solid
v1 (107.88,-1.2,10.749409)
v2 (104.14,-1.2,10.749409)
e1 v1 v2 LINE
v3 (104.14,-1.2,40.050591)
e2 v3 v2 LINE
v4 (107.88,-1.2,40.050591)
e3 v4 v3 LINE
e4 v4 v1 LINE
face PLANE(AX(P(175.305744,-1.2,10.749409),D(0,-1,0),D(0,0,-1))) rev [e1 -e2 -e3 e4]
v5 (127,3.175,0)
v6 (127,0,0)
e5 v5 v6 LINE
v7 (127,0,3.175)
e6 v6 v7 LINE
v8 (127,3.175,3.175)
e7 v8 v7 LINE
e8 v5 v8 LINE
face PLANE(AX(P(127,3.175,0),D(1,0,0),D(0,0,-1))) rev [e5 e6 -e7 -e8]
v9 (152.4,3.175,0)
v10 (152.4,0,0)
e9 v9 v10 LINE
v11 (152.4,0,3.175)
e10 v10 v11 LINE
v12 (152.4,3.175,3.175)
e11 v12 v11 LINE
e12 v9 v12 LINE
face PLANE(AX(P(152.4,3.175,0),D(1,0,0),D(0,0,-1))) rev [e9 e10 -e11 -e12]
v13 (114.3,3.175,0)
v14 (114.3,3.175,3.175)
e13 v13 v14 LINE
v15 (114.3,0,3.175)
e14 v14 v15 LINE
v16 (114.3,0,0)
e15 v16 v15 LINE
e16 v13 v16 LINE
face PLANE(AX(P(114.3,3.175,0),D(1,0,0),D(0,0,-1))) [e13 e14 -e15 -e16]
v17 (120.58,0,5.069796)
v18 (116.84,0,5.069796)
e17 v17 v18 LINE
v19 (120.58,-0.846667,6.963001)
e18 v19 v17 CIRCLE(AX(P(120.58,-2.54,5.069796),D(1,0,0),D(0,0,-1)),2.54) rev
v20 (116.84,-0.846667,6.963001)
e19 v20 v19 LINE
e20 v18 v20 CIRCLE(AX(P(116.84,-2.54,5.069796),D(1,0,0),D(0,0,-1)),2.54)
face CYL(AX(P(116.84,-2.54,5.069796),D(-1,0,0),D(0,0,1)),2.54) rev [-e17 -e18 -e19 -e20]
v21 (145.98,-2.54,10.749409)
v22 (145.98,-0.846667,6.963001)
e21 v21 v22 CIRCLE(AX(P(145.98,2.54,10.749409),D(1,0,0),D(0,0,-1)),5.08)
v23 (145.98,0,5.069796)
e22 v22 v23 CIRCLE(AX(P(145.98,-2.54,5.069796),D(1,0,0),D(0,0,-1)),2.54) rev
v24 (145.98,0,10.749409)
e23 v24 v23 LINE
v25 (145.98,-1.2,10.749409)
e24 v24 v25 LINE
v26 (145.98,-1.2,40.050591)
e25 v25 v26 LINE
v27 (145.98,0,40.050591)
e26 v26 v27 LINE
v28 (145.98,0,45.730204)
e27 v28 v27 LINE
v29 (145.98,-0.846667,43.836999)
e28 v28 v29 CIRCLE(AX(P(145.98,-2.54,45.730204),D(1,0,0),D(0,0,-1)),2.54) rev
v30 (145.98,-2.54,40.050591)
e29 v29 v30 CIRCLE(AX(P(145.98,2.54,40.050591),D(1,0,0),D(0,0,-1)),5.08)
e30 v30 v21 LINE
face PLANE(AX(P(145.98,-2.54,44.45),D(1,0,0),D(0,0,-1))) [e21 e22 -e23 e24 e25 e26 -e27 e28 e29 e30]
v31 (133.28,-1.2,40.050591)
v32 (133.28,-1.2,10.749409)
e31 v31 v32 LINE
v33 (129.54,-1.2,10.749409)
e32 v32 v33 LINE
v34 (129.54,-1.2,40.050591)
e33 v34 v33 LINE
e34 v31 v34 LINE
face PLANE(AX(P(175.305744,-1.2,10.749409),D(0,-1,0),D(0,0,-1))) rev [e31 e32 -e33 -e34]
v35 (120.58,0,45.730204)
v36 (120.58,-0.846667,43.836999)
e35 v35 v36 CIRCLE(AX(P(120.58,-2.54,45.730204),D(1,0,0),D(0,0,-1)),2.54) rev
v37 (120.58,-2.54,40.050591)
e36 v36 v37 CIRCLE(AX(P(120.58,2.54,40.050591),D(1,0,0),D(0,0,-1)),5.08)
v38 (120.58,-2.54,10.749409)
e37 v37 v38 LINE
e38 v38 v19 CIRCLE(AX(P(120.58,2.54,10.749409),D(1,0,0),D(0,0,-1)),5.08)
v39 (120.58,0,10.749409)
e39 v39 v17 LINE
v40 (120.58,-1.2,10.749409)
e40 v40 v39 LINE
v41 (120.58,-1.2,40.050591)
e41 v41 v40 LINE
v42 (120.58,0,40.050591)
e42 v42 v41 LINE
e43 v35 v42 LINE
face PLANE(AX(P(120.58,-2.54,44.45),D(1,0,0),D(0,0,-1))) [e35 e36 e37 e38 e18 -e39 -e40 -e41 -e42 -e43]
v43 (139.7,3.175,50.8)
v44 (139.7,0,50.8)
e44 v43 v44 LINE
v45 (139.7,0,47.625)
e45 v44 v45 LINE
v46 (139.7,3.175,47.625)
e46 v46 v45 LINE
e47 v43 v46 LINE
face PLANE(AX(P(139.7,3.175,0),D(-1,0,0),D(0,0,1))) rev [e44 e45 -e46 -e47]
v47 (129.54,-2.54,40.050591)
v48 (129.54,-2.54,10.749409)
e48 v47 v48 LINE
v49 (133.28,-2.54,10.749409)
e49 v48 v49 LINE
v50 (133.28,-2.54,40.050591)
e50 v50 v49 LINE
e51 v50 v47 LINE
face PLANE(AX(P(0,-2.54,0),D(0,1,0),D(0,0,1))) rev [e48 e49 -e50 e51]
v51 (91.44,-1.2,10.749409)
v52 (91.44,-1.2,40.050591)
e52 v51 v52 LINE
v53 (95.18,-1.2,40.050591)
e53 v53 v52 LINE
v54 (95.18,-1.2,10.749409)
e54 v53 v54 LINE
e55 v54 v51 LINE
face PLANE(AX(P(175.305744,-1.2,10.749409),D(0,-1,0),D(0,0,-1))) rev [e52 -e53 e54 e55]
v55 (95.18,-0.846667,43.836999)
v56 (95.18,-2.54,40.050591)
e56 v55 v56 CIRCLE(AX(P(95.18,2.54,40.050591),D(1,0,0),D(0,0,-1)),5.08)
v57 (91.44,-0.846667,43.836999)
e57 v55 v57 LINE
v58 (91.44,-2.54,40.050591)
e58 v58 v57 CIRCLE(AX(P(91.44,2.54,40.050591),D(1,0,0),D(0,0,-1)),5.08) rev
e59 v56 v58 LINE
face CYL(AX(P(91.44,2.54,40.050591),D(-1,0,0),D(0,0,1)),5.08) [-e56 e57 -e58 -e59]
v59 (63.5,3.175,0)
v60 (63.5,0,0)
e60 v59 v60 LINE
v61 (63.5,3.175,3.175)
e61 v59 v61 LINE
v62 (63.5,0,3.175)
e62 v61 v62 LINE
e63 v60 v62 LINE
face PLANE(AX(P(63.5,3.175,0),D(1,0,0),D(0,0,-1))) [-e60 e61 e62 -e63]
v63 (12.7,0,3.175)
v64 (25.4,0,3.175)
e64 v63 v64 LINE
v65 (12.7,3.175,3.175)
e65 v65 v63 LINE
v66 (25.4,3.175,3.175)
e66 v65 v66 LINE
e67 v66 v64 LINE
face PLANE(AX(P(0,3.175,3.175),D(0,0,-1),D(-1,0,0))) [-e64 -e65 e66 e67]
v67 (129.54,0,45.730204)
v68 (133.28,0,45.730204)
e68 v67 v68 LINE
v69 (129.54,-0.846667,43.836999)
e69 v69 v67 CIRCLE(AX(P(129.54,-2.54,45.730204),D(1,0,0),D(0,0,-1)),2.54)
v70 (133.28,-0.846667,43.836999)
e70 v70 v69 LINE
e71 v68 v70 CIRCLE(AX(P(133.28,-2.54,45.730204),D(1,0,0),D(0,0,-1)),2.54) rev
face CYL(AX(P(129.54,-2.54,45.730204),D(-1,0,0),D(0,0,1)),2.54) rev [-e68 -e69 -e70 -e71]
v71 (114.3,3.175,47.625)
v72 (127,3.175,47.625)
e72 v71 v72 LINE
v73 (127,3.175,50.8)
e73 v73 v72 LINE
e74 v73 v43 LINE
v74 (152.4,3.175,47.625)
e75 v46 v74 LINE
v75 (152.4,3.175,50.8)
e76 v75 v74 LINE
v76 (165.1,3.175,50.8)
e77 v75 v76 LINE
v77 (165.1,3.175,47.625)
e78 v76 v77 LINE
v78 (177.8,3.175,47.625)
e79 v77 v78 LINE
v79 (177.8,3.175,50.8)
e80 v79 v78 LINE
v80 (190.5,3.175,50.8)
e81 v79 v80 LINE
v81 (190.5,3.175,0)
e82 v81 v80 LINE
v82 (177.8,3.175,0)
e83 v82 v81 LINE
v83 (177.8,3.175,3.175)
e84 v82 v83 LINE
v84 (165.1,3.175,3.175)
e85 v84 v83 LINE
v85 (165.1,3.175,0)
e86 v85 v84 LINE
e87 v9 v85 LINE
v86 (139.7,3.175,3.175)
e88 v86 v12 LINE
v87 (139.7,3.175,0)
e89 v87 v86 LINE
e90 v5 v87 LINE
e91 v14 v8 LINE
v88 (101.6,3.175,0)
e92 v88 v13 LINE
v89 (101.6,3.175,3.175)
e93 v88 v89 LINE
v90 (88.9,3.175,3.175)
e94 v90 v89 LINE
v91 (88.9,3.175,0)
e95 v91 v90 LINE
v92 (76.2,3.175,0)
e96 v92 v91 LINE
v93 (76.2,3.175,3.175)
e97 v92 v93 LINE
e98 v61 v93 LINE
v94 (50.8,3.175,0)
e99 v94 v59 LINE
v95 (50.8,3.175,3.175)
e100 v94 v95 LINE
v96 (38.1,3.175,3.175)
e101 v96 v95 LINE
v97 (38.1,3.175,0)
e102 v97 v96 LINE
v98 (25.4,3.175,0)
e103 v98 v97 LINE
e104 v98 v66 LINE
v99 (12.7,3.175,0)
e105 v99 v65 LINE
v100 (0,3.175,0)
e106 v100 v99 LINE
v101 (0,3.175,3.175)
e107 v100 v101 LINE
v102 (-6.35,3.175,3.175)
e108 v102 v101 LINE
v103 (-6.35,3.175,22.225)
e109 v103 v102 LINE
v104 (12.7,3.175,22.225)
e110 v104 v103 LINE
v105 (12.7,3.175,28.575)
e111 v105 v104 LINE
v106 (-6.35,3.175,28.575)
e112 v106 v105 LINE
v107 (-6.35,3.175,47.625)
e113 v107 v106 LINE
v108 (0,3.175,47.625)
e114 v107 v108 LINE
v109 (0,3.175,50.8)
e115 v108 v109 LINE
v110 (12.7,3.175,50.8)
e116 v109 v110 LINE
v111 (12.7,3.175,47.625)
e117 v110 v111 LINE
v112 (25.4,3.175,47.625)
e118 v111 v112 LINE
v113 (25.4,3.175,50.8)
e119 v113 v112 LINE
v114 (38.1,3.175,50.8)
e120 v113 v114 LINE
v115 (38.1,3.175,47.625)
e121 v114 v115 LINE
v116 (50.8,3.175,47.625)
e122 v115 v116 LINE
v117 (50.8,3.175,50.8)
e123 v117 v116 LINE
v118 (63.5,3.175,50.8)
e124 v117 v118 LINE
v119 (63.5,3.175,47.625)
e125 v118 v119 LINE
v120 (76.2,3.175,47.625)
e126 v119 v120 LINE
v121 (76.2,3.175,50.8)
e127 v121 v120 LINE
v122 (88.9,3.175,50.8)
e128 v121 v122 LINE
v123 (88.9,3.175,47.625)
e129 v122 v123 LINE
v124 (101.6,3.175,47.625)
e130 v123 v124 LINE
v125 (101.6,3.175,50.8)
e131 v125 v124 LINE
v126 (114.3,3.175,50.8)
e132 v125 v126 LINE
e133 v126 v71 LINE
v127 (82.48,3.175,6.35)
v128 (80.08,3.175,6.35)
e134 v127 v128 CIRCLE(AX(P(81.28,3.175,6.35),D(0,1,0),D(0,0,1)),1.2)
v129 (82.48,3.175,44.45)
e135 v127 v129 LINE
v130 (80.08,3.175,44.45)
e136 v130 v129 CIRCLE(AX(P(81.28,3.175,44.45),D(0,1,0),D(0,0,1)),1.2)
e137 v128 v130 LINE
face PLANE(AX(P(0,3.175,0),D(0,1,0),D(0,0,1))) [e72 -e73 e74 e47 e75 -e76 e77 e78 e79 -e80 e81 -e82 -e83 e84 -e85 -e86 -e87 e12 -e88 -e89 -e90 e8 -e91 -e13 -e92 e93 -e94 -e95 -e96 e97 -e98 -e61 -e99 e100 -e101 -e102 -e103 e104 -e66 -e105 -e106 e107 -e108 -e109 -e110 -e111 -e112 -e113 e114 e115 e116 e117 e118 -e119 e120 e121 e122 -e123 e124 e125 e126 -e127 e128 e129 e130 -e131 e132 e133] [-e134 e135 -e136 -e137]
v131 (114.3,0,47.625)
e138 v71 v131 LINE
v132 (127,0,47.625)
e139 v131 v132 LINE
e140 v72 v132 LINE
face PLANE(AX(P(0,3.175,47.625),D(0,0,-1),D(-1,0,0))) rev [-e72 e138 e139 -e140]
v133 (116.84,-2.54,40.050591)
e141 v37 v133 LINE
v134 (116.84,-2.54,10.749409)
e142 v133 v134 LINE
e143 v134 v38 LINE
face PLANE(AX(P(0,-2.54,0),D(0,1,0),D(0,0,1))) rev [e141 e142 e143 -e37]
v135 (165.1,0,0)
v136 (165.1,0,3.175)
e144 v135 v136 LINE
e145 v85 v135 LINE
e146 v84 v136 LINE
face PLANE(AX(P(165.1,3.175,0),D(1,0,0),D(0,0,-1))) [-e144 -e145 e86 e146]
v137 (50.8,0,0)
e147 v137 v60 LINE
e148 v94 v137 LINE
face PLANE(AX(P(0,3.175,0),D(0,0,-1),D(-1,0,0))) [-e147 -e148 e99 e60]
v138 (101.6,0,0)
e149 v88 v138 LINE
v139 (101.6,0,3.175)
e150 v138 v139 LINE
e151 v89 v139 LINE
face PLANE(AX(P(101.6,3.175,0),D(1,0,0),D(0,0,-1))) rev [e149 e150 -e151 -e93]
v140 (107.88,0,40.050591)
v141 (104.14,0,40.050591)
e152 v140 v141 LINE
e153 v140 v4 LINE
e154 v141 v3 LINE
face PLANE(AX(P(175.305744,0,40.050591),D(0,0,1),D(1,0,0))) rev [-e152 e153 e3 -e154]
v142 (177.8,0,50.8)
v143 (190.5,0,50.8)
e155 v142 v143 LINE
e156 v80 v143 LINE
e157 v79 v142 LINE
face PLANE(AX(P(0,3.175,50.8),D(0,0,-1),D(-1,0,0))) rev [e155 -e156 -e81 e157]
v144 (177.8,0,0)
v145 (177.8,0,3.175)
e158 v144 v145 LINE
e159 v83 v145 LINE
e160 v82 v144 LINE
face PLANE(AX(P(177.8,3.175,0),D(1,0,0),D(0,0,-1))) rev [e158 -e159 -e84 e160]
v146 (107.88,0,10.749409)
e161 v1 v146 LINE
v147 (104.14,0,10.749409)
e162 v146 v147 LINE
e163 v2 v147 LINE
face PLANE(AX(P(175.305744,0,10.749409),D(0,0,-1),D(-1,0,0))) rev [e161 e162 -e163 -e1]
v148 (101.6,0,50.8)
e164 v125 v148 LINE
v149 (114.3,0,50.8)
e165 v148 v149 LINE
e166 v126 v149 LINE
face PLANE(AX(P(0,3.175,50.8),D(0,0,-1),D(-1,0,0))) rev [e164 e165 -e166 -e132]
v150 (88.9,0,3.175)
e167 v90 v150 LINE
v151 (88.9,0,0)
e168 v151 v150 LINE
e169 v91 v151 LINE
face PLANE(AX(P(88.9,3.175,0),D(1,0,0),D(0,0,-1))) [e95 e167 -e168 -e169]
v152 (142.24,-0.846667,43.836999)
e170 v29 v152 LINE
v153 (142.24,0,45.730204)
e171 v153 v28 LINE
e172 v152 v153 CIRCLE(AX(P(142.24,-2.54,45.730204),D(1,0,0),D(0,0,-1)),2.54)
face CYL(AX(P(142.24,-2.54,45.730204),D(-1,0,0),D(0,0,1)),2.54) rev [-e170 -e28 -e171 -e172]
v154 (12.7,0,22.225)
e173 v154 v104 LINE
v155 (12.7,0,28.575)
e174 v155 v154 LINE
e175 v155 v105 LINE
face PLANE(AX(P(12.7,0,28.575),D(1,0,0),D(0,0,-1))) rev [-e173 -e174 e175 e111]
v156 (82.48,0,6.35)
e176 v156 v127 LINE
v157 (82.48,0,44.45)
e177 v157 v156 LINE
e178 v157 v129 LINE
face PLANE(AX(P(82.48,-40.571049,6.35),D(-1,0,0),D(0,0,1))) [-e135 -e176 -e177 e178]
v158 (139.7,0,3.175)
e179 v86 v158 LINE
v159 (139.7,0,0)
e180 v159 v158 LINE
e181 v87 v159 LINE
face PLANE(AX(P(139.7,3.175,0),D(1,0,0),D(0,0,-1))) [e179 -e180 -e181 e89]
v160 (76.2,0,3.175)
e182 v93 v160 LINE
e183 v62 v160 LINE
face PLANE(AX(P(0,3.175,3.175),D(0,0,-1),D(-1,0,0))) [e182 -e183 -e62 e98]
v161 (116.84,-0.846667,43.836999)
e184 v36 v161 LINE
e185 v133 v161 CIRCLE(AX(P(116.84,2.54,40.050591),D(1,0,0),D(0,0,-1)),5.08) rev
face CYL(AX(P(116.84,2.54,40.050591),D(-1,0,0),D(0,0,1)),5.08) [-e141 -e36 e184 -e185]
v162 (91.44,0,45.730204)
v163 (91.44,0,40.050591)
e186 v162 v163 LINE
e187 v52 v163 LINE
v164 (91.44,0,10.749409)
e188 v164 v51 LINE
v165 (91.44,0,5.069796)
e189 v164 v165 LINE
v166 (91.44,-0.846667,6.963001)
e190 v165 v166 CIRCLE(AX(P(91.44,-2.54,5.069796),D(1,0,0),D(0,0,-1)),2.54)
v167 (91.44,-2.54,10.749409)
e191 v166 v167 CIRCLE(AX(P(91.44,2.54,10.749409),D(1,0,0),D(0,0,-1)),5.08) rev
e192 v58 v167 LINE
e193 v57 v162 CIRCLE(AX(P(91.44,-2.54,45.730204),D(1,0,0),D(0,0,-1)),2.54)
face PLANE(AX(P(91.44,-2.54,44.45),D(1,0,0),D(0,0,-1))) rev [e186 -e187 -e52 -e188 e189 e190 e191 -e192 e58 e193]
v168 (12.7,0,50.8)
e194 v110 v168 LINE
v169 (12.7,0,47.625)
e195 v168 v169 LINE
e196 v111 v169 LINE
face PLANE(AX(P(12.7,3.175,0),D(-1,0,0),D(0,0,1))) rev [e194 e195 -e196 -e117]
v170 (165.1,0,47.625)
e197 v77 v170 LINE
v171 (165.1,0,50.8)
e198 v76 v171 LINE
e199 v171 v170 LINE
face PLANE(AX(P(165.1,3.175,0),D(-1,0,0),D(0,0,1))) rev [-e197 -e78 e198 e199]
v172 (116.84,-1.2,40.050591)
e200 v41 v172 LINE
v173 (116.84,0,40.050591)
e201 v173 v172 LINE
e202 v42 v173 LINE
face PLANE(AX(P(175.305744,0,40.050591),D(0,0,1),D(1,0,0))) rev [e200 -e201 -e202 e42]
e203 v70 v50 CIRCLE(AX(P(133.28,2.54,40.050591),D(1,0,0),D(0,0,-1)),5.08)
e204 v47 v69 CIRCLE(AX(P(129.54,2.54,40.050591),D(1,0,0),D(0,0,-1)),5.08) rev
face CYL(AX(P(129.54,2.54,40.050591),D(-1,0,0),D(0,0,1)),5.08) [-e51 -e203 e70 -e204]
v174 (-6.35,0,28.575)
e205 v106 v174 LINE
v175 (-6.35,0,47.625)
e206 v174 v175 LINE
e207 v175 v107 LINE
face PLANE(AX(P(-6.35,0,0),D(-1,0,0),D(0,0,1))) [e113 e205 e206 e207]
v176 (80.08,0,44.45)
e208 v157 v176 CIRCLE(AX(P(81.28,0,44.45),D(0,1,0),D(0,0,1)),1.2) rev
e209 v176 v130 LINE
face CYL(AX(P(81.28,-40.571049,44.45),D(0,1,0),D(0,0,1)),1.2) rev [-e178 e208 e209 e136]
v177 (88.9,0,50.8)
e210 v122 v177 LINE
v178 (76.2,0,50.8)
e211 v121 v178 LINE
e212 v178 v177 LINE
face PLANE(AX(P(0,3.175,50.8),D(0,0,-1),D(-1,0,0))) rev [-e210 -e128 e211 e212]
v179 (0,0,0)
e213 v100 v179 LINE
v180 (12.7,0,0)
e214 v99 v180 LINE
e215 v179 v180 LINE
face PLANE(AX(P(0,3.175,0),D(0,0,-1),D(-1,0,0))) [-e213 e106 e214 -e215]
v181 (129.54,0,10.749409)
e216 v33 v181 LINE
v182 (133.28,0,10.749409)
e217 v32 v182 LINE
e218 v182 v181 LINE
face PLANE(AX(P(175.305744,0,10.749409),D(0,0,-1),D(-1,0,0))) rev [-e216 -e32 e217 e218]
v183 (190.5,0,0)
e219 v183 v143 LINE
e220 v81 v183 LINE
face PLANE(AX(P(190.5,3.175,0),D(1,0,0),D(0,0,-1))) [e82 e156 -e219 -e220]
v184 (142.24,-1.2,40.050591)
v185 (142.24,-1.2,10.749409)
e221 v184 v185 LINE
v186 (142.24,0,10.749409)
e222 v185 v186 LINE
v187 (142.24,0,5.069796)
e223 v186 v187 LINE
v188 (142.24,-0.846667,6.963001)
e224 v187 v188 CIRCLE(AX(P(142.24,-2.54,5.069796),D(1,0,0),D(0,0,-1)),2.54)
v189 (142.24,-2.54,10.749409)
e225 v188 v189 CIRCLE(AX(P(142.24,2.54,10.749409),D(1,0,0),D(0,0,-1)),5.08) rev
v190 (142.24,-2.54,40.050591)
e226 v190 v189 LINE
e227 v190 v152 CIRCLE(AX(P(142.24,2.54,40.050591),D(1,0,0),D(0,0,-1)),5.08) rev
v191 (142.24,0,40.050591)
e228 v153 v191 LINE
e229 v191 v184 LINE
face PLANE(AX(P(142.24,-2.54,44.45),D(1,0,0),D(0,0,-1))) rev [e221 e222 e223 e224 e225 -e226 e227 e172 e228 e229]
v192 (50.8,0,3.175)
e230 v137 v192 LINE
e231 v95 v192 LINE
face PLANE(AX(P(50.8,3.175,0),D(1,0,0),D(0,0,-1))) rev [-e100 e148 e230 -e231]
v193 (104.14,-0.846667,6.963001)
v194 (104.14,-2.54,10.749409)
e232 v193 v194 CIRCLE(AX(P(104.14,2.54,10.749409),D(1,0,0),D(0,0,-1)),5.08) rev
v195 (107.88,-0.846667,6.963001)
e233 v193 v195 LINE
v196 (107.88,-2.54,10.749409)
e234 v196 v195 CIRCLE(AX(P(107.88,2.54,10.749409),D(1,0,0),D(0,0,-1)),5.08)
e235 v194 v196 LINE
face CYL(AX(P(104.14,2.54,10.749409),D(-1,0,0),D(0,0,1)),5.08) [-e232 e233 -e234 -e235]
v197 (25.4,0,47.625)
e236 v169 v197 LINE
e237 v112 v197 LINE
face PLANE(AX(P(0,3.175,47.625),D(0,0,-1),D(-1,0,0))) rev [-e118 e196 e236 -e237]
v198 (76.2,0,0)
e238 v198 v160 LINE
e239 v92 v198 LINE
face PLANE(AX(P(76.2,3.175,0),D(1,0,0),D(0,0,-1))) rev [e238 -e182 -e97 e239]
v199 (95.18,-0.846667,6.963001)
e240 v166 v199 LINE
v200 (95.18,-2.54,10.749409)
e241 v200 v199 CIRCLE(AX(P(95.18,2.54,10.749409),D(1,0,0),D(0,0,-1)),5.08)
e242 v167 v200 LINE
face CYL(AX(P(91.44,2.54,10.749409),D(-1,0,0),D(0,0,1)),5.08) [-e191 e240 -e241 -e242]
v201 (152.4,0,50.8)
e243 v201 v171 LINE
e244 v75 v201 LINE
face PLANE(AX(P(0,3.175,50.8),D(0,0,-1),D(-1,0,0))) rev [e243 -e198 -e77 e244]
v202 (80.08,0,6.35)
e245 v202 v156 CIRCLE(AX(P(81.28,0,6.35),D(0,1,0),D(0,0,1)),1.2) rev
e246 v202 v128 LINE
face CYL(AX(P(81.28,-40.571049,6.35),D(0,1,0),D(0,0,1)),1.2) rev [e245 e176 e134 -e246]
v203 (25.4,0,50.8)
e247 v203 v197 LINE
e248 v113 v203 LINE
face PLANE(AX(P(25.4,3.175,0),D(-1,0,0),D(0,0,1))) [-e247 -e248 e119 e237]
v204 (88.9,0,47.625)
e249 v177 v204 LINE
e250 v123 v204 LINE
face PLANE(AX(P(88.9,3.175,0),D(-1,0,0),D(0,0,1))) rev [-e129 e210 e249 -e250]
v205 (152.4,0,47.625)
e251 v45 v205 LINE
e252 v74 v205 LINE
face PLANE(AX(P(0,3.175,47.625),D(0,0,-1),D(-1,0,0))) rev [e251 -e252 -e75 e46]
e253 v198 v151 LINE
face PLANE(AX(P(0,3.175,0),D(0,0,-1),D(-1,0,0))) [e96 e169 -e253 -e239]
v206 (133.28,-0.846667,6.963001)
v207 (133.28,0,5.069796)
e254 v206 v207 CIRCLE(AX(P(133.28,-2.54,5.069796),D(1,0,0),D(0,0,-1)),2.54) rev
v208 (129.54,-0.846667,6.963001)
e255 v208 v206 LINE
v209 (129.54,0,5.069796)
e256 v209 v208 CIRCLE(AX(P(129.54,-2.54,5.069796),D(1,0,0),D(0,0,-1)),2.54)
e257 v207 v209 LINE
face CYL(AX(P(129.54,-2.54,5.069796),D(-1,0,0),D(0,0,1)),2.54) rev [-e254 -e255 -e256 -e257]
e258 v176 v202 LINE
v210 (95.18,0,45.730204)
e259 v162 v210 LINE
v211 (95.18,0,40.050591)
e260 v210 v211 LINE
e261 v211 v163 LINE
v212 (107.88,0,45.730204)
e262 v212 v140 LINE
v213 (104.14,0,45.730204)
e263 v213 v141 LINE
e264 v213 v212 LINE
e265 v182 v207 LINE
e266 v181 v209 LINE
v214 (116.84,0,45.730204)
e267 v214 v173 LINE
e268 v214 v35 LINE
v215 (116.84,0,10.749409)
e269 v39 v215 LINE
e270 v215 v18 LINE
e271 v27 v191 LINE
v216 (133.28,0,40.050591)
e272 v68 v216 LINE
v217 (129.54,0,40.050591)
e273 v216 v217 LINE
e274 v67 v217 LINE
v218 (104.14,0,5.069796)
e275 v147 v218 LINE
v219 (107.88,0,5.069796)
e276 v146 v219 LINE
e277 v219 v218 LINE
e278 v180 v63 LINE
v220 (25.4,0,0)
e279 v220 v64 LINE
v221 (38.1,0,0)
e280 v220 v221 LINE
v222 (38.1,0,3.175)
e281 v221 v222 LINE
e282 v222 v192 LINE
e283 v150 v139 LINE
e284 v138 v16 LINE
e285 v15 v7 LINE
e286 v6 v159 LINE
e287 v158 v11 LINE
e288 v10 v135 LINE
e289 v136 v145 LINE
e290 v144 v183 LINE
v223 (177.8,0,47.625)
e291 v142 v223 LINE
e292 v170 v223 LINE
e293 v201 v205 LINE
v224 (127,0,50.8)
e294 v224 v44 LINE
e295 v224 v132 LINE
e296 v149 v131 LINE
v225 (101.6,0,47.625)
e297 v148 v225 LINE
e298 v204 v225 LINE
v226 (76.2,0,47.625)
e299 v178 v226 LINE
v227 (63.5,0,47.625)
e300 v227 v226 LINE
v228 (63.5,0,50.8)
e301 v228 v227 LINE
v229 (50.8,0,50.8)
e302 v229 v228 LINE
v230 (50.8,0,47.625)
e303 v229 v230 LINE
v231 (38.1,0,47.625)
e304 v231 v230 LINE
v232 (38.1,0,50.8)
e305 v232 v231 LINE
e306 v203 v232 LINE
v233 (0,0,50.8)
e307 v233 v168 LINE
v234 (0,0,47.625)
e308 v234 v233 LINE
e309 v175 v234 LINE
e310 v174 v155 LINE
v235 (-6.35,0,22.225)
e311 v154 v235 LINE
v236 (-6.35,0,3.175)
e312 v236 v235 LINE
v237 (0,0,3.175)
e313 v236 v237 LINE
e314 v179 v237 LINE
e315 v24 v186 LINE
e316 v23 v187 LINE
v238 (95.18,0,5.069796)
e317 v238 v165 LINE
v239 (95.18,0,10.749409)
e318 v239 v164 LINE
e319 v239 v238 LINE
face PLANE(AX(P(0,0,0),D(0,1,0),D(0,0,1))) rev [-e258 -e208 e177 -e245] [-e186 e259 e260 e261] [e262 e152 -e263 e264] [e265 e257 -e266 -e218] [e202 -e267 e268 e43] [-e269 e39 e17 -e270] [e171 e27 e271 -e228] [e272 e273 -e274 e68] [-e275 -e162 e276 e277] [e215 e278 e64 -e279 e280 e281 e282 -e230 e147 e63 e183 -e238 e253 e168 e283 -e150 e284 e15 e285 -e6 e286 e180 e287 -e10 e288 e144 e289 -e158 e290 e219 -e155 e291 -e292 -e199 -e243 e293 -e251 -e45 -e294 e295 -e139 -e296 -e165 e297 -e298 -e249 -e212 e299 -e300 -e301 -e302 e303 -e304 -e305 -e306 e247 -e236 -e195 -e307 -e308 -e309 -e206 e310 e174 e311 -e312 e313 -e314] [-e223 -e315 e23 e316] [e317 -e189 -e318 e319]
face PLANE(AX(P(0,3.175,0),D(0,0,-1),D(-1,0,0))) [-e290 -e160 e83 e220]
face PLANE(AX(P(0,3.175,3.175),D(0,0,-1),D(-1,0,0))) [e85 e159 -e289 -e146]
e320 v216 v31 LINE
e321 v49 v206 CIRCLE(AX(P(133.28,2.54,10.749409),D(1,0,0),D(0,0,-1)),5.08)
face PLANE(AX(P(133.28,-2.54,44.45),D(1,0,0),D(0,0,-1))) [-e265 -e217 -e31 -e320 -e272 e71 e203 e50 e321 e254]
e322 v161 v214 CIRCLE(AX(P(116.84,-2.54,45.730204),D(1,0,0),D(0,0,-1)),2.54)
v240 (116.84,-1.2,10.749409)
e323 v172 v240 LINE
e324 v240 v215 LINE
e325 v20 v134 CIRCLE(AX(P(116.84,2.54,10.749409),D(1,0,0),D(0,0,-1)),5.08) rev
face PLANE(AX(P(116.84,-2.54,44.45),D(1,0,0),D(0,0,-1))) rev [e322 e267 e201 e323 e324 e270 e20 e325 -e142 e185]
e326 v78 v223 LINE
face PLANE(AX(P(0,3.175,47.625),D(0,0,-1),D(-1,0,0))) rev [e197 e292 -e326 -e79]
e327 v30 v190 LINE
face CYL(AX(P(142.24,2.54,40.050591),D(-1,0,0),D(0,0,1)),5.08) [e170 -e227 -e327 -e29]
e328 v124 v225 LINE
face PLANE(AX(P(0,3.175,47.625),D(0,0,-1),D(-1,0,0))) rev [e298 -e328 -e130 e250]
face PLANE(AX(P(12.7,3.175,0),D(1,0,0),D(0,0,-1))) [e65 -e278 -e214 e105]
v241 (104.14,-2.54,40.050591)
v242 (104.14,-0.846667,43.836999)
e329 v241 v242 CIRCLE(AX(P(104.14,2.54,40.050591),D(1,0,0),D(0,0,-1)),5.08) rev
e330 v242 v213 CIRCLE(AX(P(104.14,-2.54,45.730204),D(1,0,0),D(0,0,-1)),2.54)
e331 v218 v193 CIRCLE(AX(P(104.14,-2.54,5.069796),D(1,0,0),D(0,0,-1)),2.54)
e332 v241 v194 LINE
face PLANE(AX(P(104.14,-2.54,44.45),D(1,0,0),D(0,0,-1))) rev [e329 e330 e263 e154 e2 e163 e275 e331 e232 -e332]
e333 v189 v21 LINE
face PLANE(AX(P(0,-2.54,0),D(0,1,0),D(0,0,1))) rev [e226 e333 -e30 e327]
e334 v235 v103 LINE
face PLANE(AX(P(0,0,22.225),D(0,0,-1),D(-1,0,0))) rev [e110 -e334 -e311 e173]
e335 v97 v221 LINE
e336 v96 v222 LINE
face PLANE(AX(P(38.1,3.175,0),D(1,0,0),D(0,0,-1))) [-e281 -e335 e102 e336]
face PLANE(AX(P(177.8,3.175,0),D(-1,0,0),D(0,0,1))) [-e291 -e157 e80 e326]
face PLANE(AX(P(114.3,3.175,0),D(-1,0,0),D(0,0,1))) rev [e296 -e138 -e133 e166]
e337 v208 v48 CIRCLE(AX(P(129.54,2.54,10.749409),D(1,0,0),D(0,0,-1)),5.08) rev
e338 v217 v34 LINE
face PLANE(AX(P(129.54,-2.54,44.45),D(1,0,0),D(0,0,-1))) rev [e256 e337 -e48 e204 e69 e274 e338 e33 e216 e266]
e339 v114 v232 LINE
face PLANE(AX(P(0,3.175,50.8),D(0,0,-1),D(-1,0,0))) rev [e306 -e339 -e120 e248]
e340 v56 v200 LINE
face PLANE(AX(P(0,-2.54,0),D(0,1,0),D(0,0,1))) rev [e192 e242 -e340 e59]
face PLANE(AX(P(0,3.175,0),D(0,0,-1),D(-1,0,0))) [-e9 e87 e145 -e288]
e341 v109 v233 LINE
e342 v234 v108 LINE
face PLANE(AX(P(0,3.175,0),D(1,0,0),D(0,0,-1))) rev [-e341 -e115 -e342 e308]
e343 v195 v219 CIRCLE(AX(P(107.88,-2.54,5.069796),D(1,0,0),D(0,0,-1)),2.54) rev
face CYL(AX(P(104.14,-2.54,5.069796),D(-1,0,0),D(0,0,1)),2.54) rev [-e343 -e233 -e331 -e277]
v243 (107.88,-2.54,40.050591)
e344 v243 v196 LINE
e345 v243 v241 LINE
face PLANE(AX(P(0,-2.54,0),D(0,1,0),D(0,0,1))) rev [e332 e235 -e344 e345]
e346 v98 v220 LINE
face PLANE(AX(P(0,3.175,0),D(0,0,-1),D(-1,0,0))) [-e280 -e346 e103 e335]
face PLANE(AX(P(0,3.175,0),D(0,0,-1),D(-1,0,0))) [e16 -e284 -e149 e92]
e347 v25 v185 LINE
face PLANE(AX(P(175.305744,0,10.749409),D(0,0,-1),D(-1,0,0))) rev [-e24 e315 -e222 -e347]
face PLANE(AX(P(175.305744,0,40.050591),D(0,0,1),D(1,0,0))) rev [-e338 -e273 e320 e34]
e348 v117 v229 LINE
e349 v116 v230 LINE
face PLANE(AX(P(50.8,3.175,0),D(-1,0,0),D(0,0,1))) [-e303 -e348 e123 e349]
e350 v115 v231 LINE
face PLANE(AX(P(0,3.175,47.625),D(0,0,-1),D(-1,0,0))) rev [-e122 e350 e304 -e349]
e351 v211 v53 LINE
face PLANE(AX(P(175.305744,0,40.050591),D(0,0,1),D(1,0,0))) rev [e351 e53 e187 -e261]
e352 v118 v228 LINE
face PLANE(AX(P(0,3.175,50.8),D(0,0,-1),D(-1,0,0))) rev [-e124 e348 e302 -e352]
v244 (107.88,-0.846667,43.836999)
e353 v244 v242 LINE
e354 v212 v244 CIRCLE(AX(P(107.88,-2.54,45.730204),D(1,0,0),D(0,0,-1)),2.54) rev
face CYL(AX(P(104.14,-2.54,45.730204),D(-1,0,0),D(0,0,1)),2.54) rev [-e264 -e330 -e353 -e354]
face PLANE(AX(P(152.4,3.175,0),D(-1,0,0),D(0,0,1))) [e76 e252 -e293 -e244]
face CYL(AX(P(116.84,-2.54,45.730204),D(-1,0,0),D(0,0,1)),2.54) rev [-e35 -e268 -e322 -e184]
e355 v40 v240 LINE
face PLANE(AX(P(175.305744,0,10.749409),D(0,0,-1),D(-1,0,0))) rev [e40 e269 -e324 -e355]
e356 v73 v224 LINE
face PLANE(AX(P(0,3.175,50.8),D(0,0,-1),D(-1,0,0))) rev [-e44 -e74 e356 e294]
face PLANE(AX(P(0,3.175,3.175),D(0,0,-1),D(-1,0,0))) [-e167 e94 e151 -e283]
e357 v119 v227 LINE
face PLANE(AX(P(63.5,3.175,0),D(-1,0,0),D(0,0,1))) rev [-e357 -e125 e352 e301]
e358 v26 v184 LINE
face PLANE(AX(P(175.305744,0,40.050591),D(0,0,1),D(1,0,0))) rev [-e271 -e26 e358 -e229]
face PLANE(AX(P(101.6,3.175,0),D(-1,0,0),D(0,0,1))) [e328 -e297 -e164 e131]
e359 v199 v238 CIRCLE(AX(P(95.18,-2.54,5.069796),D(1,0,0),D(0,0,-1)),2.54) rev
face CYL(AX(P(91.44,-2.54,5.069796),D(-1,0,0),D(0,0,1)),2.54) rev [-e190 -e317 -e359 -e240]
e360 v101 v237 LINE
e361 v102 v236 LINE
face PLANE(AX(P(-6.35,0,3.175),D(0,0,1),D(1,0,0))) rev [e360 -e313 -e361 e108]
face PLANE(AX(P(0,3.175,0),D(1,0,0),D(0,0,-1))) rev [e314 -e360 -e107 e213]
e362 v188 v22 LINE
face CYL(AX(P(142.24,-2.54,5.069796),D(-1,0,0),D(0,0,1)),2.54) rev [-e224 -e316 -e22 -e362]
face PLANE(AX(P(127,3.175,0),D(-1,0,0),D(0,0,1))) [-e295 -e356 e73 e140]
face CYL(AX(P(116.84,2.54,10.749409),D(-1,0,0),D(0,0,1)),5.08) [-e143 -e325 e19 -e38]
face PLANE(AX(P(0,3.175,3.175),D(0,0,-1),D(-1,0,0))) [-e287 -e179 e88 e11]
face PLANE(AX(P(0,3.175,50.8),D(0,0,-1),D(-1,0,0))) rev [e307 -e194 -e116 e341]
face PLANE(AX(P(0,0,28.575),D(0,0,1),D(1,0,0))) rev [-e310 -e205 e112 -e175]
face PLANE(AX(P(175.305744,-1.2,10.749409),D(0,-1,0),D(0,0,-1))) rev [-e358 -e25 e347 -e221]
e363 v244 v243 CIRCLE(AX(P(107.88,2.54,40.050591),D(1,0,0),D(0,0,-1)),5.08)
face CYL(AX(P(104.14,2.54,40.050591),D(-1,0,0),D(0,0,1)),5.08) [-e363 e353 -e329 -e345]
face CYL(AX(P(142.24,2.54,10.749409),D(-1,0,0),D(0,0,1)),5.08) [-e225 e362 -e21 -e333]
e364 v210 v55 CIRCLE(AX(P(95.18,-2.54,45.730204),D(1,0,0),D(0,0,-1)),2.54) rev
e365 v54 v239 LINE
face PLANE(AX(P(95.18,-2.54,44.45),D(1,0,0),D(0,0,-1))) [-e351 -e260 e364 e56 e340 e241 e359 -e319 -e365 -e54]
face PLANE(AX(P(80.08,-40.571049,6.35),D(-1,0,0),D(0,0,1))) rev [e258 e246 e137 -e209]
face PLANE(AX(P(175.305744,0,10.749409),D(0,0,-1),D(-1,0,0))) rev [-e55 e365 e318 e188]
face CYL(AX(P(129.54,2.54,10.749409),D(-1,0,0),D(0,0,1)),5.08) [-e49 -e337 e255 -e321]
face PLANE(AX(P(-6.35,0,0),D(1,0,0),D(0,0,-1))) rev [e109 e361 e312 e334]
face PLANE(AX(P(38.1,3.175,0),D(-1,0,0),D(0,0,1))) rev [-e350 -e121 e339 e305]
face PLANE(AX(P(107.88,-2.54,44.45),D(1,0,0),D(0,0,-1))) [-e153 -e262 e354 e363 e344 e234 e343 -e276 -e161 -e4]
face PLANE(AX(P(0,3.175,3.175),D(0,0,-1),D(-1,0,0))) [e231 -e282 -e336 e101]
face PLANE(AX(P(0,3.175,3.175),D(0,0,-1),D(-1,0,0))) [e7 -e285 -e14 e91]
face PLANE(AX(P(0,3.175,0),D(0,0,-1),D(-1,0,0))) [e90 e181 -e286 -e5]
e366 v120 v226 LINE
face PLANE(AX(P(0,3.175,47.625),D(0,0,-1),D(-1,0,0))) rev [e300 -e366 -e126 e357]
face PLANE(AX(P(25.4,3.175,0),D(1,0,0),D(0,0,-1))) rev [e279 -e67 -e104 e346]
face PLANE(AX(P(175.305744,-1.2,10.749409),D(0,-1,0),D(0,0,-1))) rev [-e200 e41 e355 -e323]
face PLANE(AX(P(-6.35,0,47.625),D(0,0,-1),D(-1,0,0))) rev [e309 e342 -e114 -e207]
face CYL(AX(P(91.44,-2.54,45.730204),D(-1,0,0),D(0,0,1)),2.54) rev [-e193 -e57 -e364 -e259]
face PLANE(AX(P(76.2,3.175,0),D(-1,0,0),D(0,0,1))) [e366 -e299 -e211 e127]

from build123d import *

# Parameters (mm, degrees)
BOSS_EXTRUDE1_DEPTH = 3.175
SKETCH2_W           = 12.7
SKETCH2_H           = 6.35
CUT_EXTRUDE1_DEPTH  = 198.182581951
SKETCH3_W           = 19.05
SKETCH3_H           = 3.175
BOSS_EXTRUDE2_DEPTH = 6.35
CUT_EXTRUDE4_DEPTH  = 3.175
SKETCH6_W           = 3.74
SKETCH6_H           = 38.1
BOSS_EXTRUDE3_DEPTH = 2.54
FILLET1_R           = 5.08
CUT_EXTRUDE5_REACH  = 113.371
SKETCH7_W           = 29.301181898
SKETCH7_H           = 1.2
FILLET3_R           = 2.54


with BuildPart() as part:
    # Sketch1 → Boss-Extrude1 (new body)
    with BuildSketch(Plane(origin=(0, 0, 0), x_dir=(1, 0, 0), z_dir=(0, 1, 0))):
        Polygon((12.7, 0), (0, 0), (0, -50.8), (12.7, -50.8), (12.7, -47.625), (25.4, -47.625), (25.4, -50.8), (38.1, -50.8), (38.1, -47.625), (50.8, -47.625), (50.8, -50.8), (63.5, -50.8), (63.5, -47.625), (76.2, -47.625), (76.2, -50.8), (88.9, -50.8), (88.9, -47.625), (101.6, -47.625), (101.6, -50.8), (114.3, -50.8), (114.3, -47.625), (127, -47.625), (127, -50.8), (139.7, -50.8), (139.7, -47.625), (152.4, -47.625), (152.4, -50.8), (165.1, -50.8), (165.1, -47.625), (177.8, -47.625), (177.8, -50.8), (190.5, -50.8), (190.5, 0), (177.8, 0), (177.8, -3.175), (165.1, -3.175), (165.1, 0), (152.4, 0), (152.4, -3.175), (139.7, -3.175), (139.7, 0), (127, 0), (127, -3.175), (114.3, -3.175), (114.3, 0), (101.6, 0), (101.6, -3.175), (88.9, -3.175), (88.9, 0), (76.2, 0), (76.2, -3.175), (63.5, -3.175), (63.5, 0), (50.8, 0), (50.8, -3.175), (38.1, -3.175), (38.1, 0), (25.4, 0), (25.4, -3.175), (12.7, -3.175), align=None)
    extrude(amount=BOSS_EXTRUDE1_DEPTH)

    # Sketch2 → Cut-Extrude1 (cut, through all)
    with BuildSketch(Plane(origin=(0, 3.175, 0), x_dir=(1, 0, 0), z_dir=(0, 1, 0))):
        with Locations((6.35, -25.4)):
            Rectangle(SKETCH2_W, SKETCH2_H)
    extrude(amount=-CUT_EXTRUDE1_DEPTH, mode=Mode.SUBTRACT)

    # Sketch3 → Boss-Extrude2 (add)
    with BuildSketch(Plane.ZY):
        with Locations((12.7, 1.5875)):
            Rectangle(SKETCH3_W, SKETCH3_H)
        with Locations((38.1, 1.5875)):
            Rectangle(SKETCH3_W, SKETCH3_H)
    extrude(amount=BOSS_EXTRUDE2_DEPTH)

    # Sketch5 → Cut-Extrude4 (cut)
    with BuildSketch(Plane(origin=(0, 3.175, 0), x_dir=(1, 0, 0), z_dir=(0, 1, 0))):
        with BuildLine():
            Line((82.48, -6.35), (82.48, -44.45))
            ThreePointArc((82.48, -44.45), (81.28, -45.65), (80.08, -44.45))
            Line((80.08, -44.45), (80.08, -6.35))
            ThreePointArc((80.08, -6.35), (81.28, -5.15), (82.48, -6.35))
        make_face()
    extrude(amount=-CUT_EXTRUDE4_DEPTH, mode=Mode.SUBTRACT)

    # Sketch6 → Boss-Extrude3 (add)
    with BuildSketch(Plane(origin=(0, 0, 0), x_dir=(-1, 0, 0), z_dir=(0, -1, 0))):
        with Locations((-106.01, -25.4)):
            Rectangle(SKETCH6_W, SKETCH6_H)
        with Locations((-93.31, -25.4)):
            Rectangle(SKETCH6_W, SKETCH6_H)
        with Locations((-118.71, -25.4)):
            Rectangle(SKETCH6_W, SKETCH6_H)
        with Locations((-131.41, -25.4)):
            Rectangle(SKETCH6_W, SKETCH6_H)
        with Locations((-144.11, -25.4)):
            Rectangle(SKETCH6_W, SKETCH6_H)
    extrude(amount=BOSS_EXTRUDE3_DEPTH)

    # Fillet1
    # the kernel refuses this fillet: 5.08 mm, written as the material it takes off along each edge
    with BuildSketch(Plane(origin=(106.178522628, -2.54, 6.35), x_dir=(0, 1, 0), z_dir=(-1, 0, 0)), Plane(origin=(80.441477372, -2.54, 44.45), x_dir=(0, 1, 0), z_dir=(1, 0, 0))) as fillet1_piece_1:
        with BuildLine():
            CenterArc((5.08, -4.399409051), FILLET1_R, 120, 60)
            Line((0, -4.399409051), (-0.1016, -4.399409051))
            Line((-0.1016, -4.399409051), (-0.1016, 0))
            Line((-0.1016, 0), (0, 0.1016))
            ThreePointArc((0, 0.1016), (1.27, 0.1016), (2.4892, 0.087988181))
            Line((2.4892, 0.087988181), (2.54, 0))
        make_face()
    extrude(amount=25.737045256, mode=Mode.SUBTRACT)
    with BuildSketch(Plane(origin=(93.141477372, -2.54, 6.35), x_dir=(0, 1, 0), z_dir=(1, 0, 0)), Plane(origin=(105.841477372, -2.54, 6.35), x_dir=(0, 1, 0), z_dir=(1, 0, 0)), Plane(origin=(118.541477372, -2.54, 6.35), x_dir=(0, 1, 0), z_dir=(1, 0, 0)), Plane(origin=(131.241477372, -2.54, 6.35), x_dir=(0, 1, 0), z_dir=(1, 0, 0)), Plane(origin=(156.978522628, -2.54, 44.45), x_dir=(0, 1, 0), z_dir=(-1, 0, 0)), Plane(origin=(144.278522628, -2.54, 44.45), x_dir=(0, 1, 0), z_dir=(-1, 0, 0)), Plane(origin=(131.578522628, -2.54, 44.45), x_dir=(0, 1, 0), z_dir=(-1, 0, 0)), Plane(origin=(118.878522628, -2.54, 44.45), x_dir=(0, 1, 0), z_dir=(-1, 0, 0))) as fillet1_piece_2:
        with BuildLine():
            CenterArc((5.08, 4.399409051), FILLET1_R, 180, 60)
            Line((0, 4.399409051), (-0.1016, 4.399409051))
            Line((-0.1016, 4.399409051), (-0.1016, 0))
            Line((-0.1016, 0), (0, -0.1016))
            ThreePointArc((0, -0.1016), (1.27, -0.1016), (2.4892, -0.087988181))
            Line((2.4892, -0.087988181), (2.54, 0))
        make_face()
    extrude(amount=25.737045256, mode=Mode.SUBTRACT)

    # Cut-Extrude5: up to this face of the body (flat: up to its plane)
    cut_extrude5_end = Plane(part.part.faces().sort_by_distance((145.98, -1.229881831, 25.4))[0])
    # Sketch7 → Cut-Extrude5 (cut, up to the picked face)
    with BuildSketch(Plane.ZY.offset(-91.44), mode=Mode.PRIVATE) as cut_extrude5_sk1:
        with Locations((25.4, -0.6)):
            Rectangle(SKETCH7_W, SKETCH7_H)
    cut_extrude5_tool1 = split(extrude(cut_extrude5_sk1.sketch, amount=-CUT_EXTRUDE5_REACH, mode=Mode.PRIVATE), bisect_by=cut_extrude5_end, keep=Keep.BOTH, mode=Mode.PRIVATE)
    add(cut_extrude5_tool1.solids().sort_by(Axis((91.44, -0.6, 25.4), (1, 0, 0)))[0], mode=Mode.SUBTRACT)

    # Fillet3
    # the kernel refuses this fillet: 2.54 mm, written as the material it adds along each edge
    with BuildSketch(Plane(origin=(120.58, 0, 6.35), x_dir=(0, 0, -1), z_dir=(-1, 0, 0)), Plane(origin=(116.84, 0, 44.45), x_dir=(0, 0, 1), z_dir=(1, 0, 0)), Plane(origin=(107.88, 0, 6.35), x_dir=(0, 0, -1), z_dir=(-1, 0, 0)), Plane(origin=(104.14, 0, 44.45), x_dir=(0, 0, 1), z_dir=(1, 0, 0)), Plane(origin=(95.18, 0, 6.35), x_dir=(0, 0, -1), z_dir=(-1, 0, 0)), Plane(origin=(91.44, 0, 44.45), x_dir=(0, 0, 1), z_dir=(1, 0, 0)), Plane(origin=(145.98, 0, 6.35), x_dir=(0, 0, -1), z_dir=(-1, 0, 0)), Plane(origin=(142.24, 0, 44.45), x_dir=(0, 0, 1), z_dir=(1, 0, 0)), Plane(origin=(133.28, 0, 6.35), x_dir=(0, 0, -1), z_dir=(-1, 0, 0)), Plane(origin=(129.54, 0, 44.45), x_dir=(0, 0, 1), z_dir=(1, 0, 0))) as fillet3_piece_1:
        with BuildLine():
            CenterArc((1.280203612, 2.54), FILLET3_R, 221.810314896, 48.189685104)
            ThreePointArc((-0.613000609, 0.846666667), (-0.284665667, 0.439141971), (0, 0))
            Line((0, 0), (1.280203612, 0))
        make_face()
    extrude(amount=3.74)


solid = part.part
